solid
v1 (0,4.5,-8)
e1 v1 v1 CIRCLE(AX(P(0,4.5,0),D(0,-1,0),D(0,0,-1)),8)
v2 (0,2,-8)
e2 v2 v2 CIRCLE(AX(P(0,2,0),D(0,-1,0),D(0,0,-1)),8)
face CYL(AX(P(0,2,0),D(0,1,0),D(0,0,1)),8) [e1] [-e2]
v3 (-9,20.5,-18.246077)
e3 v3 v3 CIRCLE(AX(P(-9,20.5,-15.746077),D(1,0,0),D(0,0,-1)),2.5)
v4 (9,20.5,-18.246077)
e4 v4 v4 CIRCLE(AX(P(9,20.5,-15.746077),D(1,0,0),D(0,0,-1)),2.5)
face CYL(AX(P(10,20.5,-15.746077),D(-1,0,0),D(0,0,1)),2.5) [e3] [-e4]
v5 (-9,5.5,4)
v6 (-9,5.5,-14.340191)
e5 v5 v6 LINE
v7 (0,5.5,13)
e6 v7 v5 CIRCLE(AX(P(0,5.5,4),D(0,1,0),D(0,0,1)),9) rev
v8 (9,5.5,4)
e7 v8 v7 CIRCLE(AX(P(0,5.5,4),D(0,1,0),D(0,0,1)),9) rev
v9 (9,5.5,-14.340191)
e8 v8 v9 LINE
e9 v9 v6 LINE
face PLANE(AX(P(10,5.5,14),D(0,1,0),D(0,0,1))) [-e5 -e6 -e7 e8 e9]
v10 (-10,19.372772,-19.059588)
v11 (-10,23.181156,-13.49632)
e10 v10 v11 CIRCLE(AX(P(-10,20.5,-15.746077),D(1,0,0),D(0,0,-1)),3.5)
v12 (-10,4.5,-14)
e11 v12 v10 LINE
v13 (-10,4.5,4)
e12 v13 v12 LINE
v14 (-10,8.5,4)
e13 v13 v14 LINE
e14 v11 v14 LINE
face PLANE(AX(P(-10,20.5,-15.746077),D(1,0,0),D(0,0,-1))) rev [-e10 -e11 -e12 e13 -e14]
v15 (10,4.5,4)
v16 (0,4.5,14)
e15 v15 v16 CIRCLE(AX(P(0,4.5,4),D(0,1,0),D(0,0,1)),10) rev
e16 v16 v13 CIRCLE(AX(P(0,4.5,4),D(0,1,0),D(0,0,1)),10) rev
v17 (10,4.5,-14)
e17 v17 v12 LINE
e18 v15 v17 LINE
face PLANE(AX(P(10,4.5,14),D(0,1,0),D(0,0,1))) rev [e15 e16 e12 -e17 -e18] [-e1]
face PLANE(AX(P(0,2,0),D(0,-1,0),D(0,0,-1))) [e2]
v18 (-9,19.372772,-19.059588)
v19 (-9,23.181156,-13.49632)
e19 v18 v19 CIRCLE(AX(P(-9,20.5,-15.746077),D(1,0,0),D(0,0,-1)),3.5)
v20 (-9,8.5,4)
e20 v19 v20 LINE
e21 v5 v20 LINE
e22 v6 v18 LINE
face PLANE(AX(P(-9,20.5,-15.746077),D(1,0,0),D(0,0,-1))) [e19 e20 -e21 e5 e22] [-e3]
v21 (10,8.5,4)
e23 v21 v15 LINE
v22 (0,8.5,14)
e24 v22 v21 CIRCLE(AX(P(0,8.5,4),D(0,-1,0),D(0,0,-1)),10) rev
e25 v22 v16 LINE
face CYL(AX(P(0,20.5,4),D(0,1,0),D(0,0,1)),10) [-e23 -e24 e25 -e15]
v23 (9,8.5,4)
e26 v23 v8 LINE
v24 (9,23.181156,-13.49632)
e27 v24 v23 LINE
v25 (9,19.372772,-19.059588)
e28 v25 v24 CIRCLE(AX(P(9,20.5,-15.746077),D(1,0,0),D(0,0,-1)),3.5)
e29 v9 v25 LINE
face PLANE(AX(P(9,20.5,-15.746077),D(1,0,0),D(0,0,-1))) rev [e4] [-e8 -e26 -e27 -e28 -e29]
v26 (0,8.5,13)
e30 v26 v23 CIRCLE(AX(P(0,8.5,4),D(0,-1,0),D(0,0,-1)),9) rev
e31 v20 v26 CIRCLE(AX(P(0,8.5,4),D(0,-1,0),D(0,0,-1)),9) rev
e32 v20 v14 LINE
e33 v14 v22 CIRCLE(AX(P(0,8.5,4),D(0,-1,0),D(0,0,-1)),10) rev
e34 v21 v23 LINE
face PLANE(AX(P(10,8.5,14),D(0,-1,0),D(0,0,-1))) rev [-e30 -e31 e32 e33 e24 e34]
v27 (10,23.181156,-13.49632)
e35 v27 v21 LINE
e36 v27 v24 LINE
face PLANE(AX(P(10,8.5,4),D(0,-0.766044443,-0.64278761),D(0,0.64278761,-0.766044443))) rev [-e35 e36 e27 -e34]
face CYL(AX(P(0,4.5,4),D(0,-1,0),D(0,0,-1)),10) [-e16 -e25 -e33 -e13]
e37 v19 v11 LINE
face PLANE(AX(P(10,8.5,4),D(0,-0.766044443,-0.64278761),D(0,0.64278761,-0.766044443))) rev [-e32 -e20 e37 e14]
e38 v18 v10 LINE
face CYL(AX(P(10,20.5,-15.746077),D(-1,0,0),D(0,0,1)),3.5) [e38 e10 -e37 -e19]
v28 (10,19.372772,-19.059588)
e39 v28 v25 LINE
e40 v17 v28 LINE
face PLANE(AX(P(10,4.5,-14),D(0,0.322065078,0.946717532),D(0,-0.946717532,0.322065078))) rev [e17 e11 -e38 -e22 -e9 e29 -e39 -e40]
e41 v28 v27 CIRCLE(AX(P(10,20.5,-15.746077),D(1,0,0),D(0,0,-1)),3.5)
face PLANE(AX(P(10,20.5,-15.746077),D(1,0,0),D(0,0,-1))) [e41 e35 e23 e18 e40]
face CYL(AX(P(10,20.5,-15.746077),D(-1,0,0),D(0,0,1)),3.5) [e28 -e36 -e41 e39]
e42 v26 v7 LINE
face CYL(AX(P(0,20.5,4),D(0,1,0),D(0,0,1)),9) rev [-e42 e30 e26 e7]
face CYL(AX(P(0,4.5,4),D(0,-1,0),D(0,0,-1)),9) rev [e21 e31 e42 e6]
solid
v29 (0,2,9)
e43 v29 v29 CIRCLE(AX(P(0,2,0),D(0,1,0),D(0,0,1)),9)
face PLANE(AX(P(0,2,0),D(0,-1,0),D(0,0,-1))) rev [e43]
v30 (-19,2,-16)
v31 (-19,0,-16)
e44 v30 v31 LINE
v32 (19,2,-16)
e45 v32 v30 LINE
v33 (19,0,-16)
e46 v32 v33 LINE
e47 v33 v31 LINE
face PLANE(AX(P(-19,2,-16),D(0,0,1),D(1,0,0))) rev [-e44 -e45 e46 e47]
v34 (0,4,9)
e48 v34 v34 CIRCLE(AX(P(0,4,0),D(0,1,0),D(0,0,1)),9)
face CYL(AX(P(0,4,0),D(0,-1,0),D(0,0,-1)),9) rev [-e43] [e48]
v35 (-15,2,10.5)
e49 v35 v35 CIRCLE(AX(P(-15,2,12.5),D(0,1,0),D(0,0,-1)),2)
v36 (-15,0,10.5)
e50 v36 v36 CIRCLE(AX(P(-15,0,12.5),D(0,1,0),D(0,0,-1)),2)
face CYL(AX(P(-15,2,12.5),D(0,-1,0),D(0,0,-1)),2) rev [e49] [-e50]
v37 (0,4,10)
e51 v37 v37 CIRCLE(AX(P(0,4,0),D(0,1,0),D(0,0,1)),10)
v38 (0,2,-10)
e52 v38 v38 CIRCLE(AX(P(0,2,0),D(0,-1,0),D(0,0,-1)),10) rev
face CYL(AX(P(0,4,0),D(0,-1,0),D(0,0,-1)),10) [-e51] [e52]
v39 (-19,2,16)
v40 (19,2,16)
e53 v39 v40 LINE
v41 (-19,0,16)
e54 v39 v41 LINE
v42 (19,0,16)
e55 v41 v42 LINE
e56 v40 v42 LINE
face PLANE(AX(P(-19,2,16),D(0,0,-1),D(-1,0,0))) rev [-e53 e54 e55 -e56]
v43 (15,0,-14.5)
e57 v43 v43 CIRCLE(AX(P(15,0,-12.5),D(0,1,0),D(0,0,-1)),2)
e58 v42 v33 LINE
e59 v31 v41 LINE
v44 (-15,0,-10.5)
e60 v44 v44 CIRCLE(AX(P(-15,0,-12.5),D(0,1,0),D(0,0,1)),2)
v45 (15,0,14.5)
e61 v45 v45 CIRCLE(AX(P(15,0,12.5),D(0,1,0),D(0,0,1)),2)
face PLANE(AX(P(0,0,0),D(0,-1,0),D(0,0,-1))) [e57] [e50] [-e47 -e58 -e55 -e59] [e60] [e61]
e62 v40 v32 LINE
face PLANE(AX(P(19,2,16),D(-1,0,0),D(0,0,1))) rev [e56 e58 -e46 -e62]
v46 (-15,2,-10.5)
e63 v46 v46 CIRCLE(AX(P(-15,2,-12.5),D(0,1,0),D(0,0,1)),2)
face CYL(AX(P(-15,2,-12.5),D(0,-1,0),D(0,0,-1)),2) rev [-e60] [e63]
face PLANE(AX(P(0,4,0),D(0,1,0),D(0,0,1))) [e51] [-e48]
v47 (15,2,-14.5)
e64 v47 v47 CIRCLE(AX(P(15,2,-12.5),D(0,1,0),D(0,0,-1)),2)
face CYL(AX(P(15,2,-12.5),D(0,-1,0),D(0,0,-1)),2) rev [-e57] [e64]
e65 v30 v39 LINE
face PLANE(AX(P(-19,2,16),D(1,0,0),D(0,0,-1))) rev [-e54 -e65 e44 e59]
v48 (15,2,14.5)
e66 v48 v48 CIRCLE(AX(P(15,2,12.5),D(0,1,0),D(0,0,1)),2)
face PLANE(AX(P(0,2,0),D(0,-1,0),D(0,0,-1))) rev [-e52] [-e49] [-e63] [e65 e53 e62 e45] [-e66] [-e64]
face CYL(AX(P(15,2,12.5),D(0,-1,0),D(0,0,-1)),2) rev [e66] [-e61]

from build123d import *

# Parameters (mm, degrees)
SKETCH1_W               = 38
SKETCH1_H               = 32
SKETCH1_R               = 2
BOSS_EXTRUDE1_DEPTH     = 2
SKETCH2_R               = 10
SKETCH2_R_2             = 9
BOSS_EXTRUDE2_DEPTH     = 2
BOSS_EXTRUDE3_DEPTH     = 10
FILLET1_R               = 10
SHELL1_START            = 5.5
SHELL1_DEPTH            = 18.5
SKETCH5_R               = 8
BOSS_EXTRUDE4_DEPTH     = 2.5
BOSS_EXTRUDE5_START     = -19
BOSS_EXTRUDE5_OUTLINE_R = 2.5
BOSS_EXTRUDE5_DEPTH     = 18


# Read off the part's stored shape, not the designer's step: Shell1, Boss-Extrude5
with BuildPart() as part:
    # Sketch1 → Boss-Extrude1 (new body)
    with BuildSketch(Plane(origin=(0, 0, 0), x_dir=(1, 0, 0), z_dir=(0, 1, 0))):
        Rectangle(SKETCH1_W, SKETCH1_H)
        with Locations(Location((-15, 12.5, 0), (0, 0, 270))):
            Circle(SKETCH1_R, mode=Mode.SUBTRACT)
        with Locations(Location((15, 12.5, 0), (0, 0, 90))):
            Circle(SKETCH1_R, mode=Mode.SUBTRACT)
        with Locations(Location((-15, -12.5, 0), (0, 0, 90))):
            Circle(SKETCH1_R, mode=Mode.SUBTRACT)
        with Locations(Location((15, -12.5, 0), (0, 0, 270))):
            Circle(SKETCH1_R, mode=Mode.SUBTRACT)
    extrude(amount=BOSS_EXTRUDE1_DEPTH)

    # Sketch2 → Boss-Extrude2 (add)
    with BuildSketch(Plane(origin=(0, 2, 0), x_dir=(1, 0, 0), z_dir=(0, 1, 0))):
        with Locations(Location((0, 0, 0), (0, 0, 90))):
            Circle(SKETCH2_R)
        with Locations(Location((0, 0, 0), (0, 0, 270))):
            Circle(SKETCH2_R_2, mode=Mode.SUBTRACT)
    extrude(amount=BOSS_EXTRUDE2_DEPTH)


with BuildPart() as body_2:
    # Sketch4 → Boss-Extrude3 (new, symmetric)
    with BuildSketch(Plane(origin=(0, 0, 0), x_dir=(0, 0, -1), z_dir=(1, 0, 0))):
        with BuildLine():
            Line((-14, 4.5), (14, 4.5))
            Line((14, 4.5), (19.059587868, 19.372772229))
            ThreePointArc((19.059587868, 19.372772229), (17.72315501, 23.388106748), (13.496319871, 23.181155551))
            Line((13.496319871, 23.181155551), (-4, 8.5))
            Line((-4, 8.5), (-14, 8.5))
            Line((-14, 8.5), (-14, 4.5))
        make_face()
    extrude(amount=BOSS_EXTRUDE3_DEPTH, both=True)

    # Fillet1
    fillet1_edges = [body_2.edges().sort_by_distance(p)[0] for p in [
        (10, 6.5, 14),
        (-10, 6.5, 14),
    ]]
    fillet(fillet1_edges, radius=FILLET1_R - 0.0001)  # a hair under: the kernel refuses the full size

    # Shell1 outline → Shell1 (cut)
    with BuildSketch(Plane(origin=(0, 0, 0), x_dir=(1, 0, 0), z_dir=(0, 1, 0)).offset(SHELL1_START)):
        with BuildLine():
            ThreePointArc((0, -13), (6.363961031, -10.363961031), (9, -4))
            Line((9, -4), (9, 21))
            Line((9, 21), (-9, 21))
            Line((-9, 21), (-9, -4))
            ThreePointArc((-9, -4), (-6.363961031, -10.363961031), (0, -13))
        make_face()
    extrude(amount=SHELL1_DEPTH, mode=Mode.SUBTRACT)

    # Sketch5 → Boss-Extrude4 (add)
    with BuildSketch(Plane.XZ.offset(-4.5)):
        with Locations(Location((0, 0, 0), (0, 0, 270))):
            Circle(SKETCH5_R)
    extrude(amount=BOSS_EXTRUDE4_DEPTH)

    # Boss-Extrude5 outline → Boss-Extrude5 (add)
    with BuildSketch(Plane.ZY.offset(10).offset(BOSS_EXTRUDE5_START)):
        with Locations((-15.746076505, 20.5)):
            Circle(BOSS_EXTRUDE5_OUTLINE_R)
    extrude(amount=BOSS_EXTRUDE5_DEPTH)


solid = Compound([part.part, body_2.part])
